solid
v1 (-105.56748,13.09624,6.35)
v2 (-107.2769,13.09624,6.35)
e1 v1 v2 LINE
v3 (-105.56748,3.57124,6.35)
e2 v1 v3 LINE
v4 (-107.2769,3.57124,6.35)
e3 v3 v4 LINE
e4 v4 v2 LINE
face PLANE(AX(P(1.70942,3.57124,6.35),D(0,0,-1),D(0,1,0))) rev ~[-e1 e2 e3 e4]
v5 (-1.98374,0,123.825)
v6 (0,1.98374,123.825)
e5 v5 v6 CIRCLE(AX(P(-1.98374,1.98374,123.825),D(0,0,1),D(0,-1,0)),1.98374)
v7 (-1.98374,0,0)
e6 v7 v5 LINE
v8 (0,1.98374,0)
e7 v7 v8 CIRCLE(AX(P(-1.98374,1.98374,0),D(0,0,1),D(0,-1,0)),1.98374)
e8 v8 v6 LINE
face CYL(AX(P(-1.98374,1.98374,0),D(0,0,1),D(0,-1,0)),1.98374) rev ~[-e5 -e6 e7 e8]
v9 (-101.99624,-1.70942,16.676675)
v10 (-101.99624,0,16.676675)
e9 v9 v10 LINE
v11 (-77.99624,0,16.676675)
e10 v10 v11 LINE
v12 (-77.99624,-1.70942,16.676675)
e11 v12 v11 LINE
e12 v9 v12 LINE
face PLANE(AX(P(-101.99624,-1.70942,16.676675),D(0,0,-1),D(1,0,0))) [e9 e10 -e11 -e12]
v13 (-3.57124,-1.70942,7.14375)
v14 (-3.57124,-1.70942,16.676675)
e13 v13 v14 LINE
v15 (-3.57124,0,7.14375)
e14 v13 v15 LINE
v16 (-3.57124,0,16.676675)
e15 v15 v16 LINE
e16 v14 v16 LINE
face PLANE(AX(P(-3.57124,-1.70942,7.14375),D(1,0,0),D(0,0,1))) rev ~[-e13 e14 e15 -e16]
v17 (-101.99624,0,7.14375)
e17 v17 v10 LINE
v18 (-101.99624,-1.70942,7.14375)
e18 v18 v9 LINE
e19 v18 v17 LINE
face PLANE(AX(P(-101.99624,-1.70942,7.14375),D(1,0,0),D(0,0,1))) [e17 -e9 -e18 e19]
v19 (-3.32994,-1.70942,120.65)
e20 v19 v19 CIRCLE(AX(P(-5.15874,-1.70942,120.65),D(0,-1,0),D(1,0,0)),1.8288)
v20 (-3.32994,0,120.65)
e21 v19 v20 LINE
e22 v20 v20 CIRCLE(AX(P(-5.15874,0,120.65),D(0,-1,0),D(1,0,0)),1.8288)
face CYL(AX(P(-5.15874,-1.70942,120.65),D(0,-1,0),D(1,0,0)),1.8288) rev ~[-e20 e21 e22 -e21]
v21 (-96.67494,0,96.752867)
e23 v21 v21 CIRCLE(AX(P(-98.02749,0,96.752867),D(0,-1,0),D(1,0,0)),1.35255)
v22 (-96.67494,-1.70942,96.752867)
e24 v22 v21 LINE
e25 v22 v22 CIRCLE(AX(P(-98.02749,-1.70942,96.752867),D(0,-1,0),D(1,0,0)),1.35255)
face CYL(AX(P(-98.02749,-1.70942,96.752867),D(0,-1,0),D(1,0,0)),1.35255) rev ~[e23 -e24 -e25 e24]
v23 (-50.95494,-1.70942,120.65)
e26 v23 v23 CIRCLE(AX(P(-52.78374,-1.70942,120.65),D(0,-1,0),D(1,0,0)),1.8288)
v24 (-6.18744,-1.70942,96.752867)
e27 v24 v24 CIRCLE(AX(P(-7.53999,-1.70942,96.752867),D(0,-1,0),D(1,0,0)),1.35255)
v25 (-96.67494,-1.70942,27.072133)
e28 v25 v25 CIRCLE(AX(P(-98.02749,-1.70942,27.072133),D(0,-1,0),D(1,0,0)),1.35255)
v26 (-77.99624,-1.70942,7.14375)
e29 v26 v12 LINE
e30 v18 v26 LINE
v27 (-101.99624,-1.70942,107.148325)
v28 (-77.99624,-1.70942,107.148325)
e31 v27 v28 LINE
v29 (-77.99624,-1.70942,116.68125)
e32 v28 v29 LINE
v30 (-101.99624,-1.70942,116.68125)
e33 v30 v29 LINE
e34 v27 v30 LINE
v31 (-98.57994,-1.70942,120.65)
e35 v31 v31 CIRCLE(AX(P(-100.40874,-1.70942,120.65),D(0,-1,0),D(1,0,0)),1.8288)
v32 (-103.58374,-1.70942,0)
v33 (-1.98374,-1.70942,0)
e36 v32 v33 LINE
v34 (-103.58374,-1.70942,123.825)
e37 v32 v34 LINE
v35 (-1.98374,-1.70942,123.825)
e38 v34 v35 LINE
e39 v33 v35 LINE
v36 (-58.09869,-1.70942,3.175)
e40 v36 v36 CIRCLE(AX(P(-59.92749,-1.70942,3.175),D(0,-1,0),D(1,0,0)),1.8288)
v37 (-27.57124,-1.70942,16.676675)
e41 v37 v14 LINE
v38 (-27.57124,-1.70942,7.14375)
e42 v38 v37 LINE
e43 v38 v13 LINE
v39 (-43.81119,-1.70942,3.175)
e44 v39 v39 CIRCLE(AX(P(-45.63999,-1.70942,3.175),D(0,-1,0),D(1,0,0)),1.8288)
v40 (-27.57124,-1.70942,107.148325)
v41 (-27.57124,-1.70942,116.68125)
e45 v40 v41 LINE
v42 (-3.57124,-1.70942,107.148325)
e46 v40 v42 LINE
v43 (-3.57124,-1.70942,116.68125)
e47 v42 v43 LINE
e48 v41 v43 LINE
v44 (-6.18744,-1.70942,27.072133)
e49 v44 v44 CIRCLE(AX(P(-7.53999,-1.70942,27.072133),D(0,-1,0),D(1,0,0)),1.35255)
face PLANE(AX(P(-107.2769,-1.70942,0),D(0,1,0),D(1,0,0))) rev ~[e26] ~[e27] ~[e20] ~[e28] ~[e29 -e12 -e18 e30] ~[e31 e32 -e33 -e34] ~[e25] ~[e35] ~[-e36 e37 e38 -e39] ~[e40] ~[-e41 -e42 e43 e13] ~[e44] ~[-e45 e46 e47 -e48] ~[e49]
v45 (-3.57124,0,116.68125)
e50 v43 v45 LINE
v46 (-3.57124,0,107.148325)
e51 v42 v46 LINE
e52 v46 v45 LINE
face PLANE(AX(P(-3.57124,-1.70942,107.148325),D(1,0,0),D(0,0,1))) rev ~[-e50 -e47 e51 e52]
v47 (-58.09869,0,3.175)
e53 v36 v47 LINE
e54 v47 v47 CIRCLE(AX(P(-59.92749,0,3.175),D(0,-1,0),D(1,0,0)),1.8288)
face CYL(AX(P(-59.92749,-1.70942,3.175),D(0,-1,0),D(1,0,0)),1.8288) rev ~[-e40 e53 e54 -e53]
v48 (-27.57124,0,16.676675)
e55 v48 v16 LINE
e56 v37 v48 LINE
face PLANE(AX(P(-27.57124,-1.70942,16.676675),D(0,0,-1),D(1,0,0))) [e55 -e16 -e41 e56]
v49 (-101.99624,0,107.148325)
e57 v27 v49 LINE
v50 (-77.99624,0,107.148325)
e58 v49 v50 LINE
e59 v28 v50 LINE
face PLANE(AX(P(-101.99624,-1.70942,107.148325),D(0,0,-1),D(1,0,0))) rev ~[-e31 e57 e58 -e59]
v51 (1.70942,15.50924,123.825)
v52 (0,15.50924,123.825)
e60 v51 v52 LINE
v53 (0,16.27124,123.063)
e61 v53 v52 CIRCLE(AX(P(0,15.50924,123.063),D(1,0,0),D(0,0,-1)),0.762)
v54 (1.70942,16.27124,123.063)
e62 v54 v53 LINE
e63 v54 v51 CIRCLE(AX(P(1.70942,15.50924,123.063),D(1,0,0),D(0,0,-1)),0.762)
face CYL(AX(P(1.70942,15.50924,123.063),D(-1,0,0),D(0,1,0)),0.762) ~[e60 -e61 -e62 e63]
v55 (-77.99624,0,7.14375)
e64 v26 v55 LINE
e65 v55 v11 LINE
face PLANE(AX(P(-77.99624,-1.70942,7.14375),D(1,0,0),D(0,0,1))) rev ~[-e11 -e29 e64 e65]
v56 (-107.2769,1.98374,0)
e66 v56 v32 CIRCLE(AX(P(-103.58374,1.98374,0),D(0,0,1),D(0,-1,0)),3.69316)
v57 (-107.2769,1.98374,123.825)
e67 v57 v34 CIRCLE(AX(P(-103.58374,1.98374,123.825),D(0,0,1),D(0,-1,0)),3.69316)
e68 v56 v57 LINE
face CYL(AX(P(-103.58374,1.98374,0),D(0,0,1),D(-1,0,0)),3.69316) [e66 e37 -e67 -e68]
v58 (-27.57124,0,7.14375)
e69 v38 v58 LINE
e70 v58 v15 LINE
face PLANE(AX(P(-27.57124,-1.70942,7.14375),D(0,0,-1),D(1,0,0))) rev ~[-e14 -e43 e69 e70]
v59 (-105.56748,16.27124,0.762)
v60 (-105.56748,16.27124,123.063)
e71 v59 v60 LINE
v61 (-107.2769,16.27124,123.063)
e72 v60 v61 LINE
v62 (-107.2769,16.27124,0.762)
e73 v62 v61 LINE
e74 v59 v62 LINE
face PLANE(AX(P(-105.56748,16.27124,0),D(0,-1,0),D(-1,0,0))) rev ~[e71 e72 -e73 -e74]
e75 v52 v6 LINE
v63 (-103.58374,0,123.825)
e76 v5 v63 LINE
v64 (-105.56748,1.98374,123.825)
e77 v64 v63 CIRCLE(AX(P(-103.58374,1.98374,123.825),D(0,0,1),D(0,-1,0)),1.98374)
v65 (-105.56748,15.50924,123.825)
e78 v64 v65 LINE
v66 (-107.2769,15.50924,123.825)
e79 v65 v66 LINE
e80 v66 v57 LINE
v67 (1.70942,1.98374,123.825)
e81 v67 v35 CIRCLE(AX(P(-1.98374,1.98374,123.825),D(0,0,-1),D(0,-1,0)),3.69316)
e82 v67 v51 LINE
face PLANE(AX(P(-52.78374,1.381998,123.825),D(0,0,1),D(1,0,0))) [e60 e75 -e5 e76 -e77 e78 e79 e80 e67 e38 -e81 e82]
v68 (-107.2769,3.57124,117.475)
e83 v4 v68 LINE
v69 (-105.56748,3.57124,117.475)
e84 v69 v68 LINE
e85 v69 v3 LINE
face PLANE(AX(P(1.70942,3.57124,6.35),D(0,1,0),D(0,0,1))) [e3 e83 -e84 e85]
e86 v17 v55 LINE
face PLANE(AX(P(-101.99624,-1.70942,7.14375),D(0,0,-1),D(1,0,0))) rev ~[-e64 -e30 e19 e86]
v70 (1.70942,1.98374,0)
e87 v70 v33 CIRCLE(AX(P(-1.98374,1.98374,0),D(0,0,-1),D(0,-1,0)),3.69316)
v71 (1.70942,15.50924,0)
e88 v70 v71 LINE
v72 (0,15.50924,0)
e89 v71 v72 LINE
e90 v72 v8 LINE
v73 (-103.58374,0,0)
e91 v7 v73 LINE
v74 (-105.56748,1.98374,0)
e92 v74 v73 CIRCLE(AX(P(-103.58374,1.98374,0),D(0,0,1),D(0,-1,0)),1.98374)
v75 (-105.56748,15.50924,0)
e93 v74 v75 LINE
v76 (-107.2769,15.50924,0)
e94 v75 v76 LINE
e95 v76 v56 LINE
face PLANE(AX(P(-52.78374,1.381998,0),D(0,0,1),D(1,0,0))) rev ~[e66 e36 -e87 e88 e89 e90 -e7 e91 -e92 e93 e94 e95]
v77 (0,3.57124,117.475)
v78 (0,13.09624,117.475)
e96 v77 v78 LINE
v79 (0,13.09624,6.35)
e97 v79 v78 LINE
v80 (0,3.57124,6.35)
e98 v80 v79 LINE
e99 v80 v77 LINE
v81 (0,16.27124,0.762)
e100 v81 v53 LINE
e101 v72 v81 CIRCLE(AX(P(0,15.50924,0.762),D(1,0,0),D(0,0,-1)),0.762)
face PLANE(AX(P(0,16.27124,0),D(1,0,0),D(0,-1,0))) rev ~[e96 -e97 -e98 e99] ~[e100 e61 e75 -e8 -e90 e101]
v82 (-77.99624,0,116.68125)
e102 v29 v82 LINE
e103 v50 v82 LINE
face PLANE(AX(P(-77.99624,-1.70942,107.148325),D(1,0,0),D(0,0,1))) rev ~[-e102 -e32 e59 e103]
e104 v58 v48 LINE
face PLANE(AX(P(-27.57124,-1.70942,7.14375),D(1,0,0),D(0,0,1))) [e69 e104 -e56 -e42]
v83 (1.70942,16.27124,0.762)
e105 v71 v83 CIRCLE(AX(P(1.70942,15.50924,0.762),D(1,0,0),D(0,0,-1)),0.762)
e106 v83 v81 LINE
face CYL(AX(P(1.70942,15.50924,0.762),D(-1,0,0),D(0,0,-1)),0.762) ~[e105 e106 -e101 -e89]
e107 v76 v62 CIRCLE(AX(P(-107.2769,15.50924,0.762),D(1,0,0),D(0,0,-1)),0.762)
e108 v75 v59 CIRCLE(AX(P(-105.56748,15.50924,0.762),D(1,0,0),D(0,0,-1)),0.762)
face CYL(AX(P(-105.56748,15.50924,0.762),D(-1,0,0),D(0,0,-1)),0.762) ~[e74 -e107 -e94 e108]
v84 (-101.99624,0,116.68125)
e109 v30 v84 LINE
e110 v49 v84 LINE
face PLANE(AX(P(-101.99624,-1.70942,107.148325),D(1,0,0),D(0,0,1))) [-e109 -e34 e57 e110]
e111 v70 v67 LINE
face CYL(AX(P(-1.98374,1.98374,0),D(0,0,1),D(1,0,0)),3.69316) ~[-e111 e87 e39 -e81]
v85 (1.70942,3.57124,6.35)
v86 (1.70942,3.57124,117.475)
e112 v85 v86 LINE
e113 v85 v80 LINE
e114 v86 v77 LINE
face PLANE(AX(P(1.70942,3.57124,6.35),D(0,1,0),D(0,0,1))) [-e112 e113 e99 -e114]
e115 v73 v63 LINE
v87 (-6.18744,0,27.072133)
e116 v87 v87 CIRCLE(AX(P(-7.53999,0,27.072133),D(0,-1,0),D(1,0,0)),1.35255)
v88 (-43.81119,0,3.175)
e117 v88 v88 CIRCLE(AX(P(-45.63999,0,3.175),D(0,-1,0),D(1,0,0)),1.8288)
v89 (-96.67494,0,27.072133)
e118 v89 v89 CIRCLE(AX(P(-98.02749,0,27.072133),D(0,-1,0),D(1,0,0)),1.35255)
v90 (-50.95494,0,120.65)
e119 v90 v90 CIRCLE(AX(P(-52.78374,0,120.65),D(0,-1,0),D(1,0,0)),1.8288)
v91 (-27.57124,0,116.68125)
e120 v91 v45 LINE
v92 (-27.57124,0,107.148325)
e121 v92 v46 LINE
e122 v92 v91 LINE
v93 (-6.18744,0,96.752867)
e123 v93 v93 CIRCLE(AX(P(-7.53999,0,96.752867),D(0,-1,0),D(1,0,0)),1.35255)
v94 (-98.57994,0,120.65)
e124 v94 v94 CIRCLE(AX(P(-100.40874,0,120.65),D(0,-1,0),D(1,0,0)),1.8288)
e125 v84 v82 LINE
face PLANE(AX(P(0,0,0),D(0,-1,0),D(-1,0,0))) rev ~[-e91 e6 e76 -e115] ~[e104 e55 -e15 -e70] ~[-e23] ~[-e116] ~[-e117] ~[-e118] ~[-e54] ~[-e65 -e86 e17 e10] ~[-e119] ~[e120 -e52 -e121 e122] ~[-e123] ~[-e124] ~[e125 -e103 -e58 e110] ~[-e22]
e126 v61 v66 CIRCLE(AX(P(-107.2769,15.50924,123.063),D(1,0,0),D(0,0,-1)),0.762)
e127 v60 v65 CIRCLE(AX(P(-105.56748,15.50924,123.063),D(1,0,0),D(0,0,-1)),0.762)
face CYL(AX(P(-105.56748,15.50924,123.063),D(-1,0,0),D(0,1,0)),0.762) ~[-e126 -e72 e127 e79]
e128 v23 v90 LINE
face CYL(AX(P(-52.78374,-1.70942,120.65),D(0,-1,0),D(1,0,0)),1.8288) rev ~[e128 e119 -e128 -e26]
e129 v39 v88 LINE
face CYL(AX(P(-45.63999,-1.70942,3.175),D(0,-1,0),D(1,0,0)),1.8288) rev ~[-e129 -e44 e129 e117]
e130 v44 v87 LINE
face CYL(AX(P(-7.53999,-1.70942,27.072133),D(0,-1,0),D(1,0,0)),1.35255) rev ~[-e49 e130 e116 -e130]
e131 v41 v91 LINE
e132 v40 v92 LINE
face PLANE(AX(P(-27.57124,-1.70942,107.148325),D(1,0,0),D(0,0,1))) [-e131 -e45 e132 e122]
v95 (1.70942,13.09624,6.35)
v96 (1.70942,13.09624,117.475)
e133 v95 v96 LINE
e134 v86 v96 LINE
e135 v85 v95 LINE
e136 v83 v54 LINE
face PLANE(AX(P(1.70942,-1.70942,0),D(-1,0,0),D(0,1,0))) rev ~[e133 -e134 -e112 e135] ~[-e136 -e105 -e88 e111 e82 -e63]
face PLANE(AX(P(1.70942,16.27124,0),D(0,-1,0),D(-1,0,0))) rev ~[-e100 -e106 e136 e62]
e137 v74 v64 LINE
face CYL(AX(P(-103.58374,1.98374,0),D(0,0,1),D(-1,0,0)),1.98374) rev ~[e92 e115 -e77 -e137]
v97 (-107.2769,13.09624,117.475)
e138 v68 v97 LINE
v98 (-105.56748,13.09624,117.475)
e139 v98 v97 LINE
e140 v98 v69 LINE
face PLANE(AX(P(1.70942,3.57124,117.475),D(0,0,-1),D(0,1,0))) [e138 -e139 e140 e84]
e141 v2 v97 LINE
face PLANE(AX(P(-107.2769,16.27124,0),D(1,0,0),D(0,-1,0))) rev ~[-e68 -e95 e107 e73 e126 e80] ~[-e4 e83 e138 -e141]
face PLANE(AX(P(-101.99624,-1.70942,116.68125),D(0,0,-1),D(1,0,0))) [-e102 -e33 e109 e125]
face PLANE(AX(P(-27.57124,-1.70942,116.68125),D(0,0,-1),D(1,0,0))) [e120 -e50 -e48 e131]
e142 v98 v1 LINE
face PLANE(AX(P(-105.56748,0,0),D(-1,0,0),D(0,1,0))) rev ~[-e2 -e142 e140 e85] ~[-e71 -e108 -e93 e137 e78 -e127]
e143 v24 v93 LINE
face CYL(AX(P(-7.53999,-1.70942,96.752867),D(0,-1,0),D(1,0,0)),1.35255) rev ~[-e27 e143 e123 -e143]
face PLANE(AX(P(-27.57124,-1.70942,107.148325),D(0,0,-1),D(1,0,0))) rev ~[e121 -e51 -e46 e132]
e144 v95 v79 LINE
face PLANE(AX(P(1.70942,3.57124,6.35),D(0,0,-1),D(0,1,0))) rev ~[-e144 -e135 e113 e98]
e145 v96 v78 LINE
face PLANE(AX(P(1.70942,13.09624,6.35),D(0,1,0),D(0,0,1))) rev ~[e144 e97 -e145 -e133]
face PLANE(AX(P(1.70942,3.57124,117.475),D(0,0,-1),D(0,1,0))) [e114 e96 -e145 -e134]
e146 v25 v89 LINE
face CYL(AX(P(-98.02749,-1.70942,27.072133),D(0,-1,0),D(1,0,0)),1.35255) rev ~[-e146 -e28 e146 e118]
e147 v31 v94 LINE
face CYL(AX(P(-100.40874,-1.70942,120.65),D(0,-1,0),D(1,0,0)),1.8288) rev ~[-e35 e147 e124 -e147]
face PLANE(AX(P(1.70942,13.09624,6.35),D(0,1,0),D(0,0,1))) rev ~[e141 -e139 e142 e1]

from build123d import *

# Parameters (mm, degrees)
F1_DEPTH = 123.825
F2_W     = 9.525
F2_H     = 111.125
F3_DEPTH = 108.98632
F4_R     = 3.69316
F5_R     = 1.98374
F6_R     = 1.8288
F6_W     = 24
F6_H     = 9.5329248
F6_R_2   = 1.35255
F7_DEPTH = 248
F8_R     = 0.762


# Not quite as in the source:
# - an extrude ends at something that could not be found from the text; its depth is read off the source's solid


with BuildPart() as f1:
    # F0 (on Top) → F1 (new body)
    with BuildSketch(Plane.XY):
        Polygon((0, 16.27124), (0, 0), (-105.56748, 0), (-105.56748, 16.27124), (-107.2769, 16.27124), (-107.2769, -1.70942), (1.70942, -1.70942), (1.70942, 16.27124), align=None)
    extrude(amount=F1_DEPTH)

    # F2 (on face) → F3 (cut, through all)
    with BuildSketch(Plane.YZ.offset(1.70942)):
        with Locations((8.33374, 61.9125)):
            Rectangle(F2_W, F2_H)
    extrude(amount=-F3_DEPTH, mode=Mode.SUBTRACT)

    # F4
    f4_edges = [f1.edges().sort_by_distance(p)[0] for p in [
        (1.70942, -1.70942, 61.9125),
        (-107.2769, -1.70942, 61.9125),
    ]]
    fillet(f4_edges, radius=F4_R)

    # F5
    f5_edges = [f1.edges().sort_by_distance(p)[0] for p in [
        (0, 0, 61.9125),
        (-105.56748, 0, 61.9125),
    ]]
    fillet(f5_edges, radius=F5_R)

    # F6 (on face) → F7 (cut, through all)
    with BuildSketch(Plane.XZ.offset(1.70942)):
        with Locations((-52.78374, 120.65)):
            Circle(F6_R)
        with Locations((-5.15874, 120.65)):
            Circle(F6_R)
        with Locations((-100.40874, 120.65)):
            Circle(F6_R)
        with Locations((-45.63999, 3.175)):
            Circle(F6_R)
        with Locations((-59.92749, 3.175)):
            Circle(F6_R)
        with Locations((-89.99624, 111.9147876)):
            Rectangle(F6_W, F6_H)
        with Locations((-89.99624, 11.9102124)):
            Rectangle(F6_W, F6_H)
        with Locations((-15.57124, 111.9147876)):
            Rectangle(F6_W, F6_H)
        with Locations((-15.57124, 11.9102124)):
            Rectangle(F6_W, F6_H)
        with Locations((-98.02749, 96.7528672)):
            Circle(F6_R_2)
        with Locations((-98.02749, 27.0721328)):
            Circle(F6_R_2)
        with Locations((-7.53999, 27.0721328)):
            Circle(F6_R_2)
        with Locations((-7.53999, 96.7528672)):
            Circle(F6_R_2)
    extrude(amount=-F7_DEPTH, mode=Mode.SUBTRACT)

    # F8
    f8_edges = [f1.edges().sort_by_distance(p)[0] for p in [
        (-106.42219, 16.27124, 123.825),
        (0.85471, 16.27124, 123.825),
        (0.85471, 16.27124, 0),
        (-106.42219, 16.27124, 0),
    ]]
    fillet(f8_edges, radius=F8_R)


solid = f1.part
